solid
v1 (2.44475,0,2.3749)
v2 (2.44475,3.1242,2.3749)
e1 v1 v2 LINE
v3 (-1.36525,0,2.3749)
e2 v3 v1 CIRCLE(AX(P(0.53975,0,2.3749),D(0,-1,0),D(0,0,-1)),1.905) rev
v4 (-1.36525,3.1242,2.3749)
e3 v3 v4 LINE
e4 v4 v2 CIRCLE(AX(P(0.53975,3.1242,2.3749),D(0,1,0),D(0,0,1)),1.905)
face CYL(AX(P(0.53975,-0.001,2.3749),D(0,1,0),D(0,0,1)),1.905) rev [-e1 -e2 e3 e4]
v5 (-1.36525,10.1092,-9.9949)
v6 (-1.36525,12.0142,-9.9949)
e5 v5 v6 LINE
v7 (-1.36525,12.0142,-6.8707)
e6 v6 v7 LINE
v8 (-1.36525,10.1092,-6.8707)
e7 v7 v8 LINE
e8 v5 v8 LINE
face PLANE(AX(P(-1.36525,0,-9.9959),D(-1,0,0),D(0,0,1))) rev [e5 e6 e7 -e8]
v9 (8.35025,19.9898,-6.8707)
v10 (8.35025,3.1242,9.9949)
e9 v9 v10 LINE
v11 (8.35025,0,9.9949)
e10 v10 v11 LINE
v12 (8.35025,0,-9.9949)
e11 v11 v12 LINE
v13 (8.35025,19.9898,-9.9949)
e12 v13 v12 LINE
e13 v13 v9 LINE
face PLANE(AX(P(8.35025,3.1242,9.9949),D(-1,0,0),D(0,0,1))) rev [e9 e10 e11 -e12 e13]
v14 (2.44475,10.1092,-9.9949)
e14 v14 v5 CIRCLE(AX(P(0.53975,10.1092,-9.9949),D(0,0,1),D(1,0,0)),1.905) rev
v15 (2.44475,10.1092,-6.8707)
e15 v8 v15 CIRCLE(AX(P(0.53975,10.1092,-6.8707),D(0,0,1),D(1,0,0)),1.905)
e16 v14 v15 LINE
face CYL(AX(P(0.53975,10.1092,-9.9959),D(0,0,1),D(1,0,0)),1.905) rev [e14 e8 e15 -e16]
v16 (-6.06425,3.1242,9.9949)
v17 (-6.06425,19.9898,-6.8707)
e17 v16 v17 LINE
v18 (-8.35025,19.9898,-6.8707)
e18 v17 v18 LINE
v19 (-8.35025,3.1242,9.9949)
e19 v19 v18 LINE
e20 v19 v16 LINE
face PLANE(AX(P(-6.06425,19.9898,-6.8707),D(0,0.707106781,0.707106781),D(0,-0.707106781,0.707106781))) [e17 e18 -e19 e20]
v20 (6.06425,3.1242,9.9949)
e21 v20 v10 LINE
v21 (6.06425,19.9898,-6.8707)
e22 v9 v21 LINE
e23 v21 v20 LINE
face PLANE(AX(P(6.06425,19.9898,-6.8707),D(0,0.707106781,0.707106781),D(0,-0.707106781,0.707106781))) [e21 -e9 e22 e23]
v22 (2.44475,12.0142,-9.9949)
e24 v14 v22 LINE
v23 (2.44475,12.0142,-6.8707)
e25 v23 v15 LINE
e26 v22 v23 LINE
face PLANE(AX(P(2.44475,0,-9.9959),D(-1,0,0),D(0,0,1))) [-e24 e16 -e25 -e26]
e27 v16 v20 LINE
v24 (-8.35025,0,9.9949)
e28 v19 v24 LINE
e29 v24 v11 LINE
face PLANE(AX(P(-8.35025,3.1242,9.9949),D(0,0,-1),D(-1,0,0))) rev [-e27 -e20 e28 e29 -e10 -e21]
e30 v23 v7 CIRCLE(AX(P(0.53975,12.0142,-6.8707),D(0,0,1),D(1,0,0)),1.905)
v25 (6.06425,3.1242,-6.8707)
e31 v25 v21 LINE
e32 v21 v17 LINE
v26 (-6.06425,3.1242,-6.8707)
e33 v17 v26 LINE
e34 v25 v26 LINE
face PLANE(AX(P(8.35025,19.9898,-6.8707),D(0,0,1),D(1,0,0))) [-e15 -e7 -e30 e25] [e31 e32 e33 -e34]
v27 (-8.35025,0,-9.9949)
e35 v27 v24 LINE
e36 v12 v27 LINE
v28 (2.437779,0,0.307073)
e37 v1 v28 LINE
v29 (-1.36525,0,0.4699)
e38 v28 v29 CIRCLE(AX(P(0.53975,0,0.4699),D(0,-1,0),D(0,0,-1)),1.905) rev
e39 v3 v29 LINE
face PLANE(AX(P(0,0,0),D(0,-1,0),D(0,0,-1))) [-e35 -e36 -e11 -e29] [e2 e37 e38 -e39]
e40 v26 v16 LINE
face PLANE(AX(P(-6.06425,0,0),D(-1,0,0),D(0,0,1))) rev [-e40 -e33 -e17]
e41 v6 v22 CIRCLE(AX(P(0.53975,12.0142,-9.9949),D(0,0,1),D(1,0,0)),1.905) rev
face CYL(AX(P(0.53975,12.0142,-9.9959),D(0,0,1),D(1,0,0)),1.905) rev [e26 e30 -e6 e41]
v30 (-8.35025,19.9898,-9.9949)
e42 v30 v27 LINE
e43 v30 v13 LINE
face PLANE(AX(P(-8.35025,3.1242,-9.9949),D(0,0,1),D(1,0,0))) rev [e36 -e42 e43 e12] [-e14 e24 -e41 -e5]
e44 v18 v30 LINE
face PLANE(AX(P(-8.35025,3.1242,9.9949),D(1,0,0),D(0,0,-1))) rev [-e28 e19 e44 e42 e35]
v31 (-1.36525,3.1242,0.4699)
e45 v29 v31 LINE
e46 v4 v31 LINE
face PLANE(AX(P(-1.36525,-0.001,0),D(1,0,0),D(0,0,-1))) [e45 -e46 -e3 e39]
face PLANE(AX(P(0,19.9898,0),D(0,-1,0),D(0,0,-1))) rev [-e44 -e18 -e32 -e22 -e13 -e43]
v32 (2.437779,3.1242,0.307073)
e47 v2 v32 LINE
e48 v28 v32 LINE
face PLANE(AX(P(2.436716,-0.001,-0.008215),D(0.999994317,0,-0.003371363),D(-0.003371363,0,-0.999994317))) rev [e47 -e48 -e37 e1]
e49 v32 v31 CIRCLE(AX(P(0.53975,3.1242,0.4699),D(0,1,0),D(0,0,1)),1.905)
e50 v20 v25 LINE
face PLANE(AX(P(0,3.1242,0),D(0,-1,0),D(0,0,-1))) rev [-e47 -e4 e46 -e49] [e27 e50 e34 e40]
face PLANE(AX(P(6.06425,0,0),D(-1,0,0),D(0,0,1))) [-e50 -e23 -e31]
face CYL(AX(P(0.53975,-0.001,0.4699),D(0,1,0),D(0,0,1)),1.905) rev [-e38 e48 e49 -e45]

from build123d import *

# Parameters (mm, degrees)
SKETCH1_W           = 16.7005
SKETCH1_H           = 19.9898
BOSS_EXTRUDE1_DEPTH = 3.1242
SKETCH3_W           = 16.7005
SKETCH3_H           = 3.1242
BOSS_EXTRUDE2_DEPTH = 19.9898
BOSS_EXTRUDE3_DEPTH = 2.286
BOSS_EXTRUDE4_DEPTH = 2.286
CUT_EXTRUDE1_REACH  = 29.455
SKETCH6_R           = 1.905
CUT_EXTRUDE2_START  = -3.1242
CUT_EXTRUDE2_DEPTH  = 3.1242


# Read off the part's stored shape, not the designer's step: Cut-Extrude2
with BuildPart() as part:
    # Sketch1 → Boss-Extrude1 (new body)
    with BuildSketch(Plane(origin=(0, 0, 0), x_dir=(1, 0, 0), z_dir=(0, 1, 0))):
        Rectangle(SKETCH1_W, SKETCH1_H)
    extrude(amount=BOSS_EXTRUDE1_DEPTH)

    # Sketch3 → Boss-Extrude2 (add)
    with BuildSketch(Plane.XZ):
        with Locations((0, -8.4328)):
            Rectangle(SKETCH3_W, SKETCH3_H)
    extrude(amount=-BOSS_EXTRUDE2_DEPTH)

    # Sketch4 → Boss-Extrude3 (add)
    with BuildSketch(Plane(origin=(8.35025, 0, 0), x_dir=(0, 0, -1), z_dir=(1, 0, 0))):
        Polygon((6.8707, 19.9898), (-9.9949, 3.1242), (6.8707, 3.1242), align=None)
    extrude(amount=-BOSS_EXTRUDE3_DEPTH)

    # Sketch5 → Boss-Extrude4 (add)
    with BuildSketch(Plane.ZY.offset(8.35025)):
        Polygon((-6.8707, 19.9898), (9.9949, 3.1242), (-6.8707, 3.1242), align=None)
    extrude(amount=-BOSS_EXTRUDE4_DEPTH)

    # Sketch6 → Cut-Extrude1 (cut, up to next)
    with BuildSketch(Plane.XY.offset(-6.8707), mode=Mode.PRIVATE) as cut_extrude1_sk1:
        with Locations((0.53975, 10.1092)):
            Circle(SKETCH6_R)
    cut_extrude1_tool1 = extrude(cut_extrude1_sk1.sketch, amount=-CUT_EXTRUDE1_REACH, mode=Mode.PRIVATE) & part.part
    # Sketch6 → Cut-Extrude1 (cut, up to next)
    with BuildSketch(Plane.XY.offset(-6.8707), mode=Mode.PRIVATE) as cut_extrude1_sk2:
        with Locations((0.53975, 12.0142)):
            Circle(SKETCH6_R)
    cut_extrude1_tool2 = extrude(cut_extrude1_sk2.sketch, amount=-CUT_EXTRUDE1_REACH, mode=Mode.PRIVATE) & part.part
    # Sketch6 → Cut-Extrude1 (cut, up to next)
    with BuildSketch(Plane.XY.offset(-6.8707), mode=Mode.PRIVATE) as cut_extrude1_sk3:
        with BuildLine():
            Line((2.44475, 10.1092), (2.44475, 12.0142))
            ThreePointArc((2.44475, 12.0142), (2.379838699, 11.521149719), (2.189528394, 11.0617))
            ThreePointArc((2.189528394, 11.0617), (2.379838699, 10.602250281), (2.44475, 10.1092))
        make_face()
    cut_extrude1_tool3 = extrude(cut_extrude1_sk3.sketch, amount=-CUT_EXTRUDE1_REACH, mode=Mode.PRIVATE) & part.part
    # Sketch6 → Cut-Extrude1 (cut, up to next)
    with BuildSketch(Plane.XY.offset(-6.8707), mode=Mode.PRIVATE) as cut_extrude1_sk4:
        with Locations((0.53975, 12.0142)):
            Circle(SKETCH6_R)
    cut_extrude1_tool4 = extrude(cut_extrude1_sk4.sketch, amount=-CUT_EXTRUDE1_REACH, mode=Mode.PRIVATE) & part.part
    # Sketch6 → Cut-Extrude1 (cut, up to next)
    with BuildSketch(Plane.XY.offset(-6.8707), mode=Mode.PRIVATE) as cut_extrude1_sk5:
        with Locations((0.53975, 10.1092)):
            Circle(SKETCH6_R)
    cut_extrude1_tool5 = extrude(cut_extrude1_sk5.sketch, amount=-CUT_EXTRUDE1_REACH, mode=Mode.PRIVATE) & part.part
    # Sketch6 → Cut-Extrude1 (cut, up to next)
    with BuildSketch(Plane.XY.offset(-6.8707), mode=Mode.PRIVATE) as cut_extrude1_sk6:
        with BuildLine():
            ThreePointArc((-1.110028394, 11.0617), (-1.300338699, 11.521149719), (-1.36525, 12.0142))
            Line((-1.36525, 12.0142), (-1.36525, 10.1092))
            ThreePointArc((-1.36525, 10.1092), (-1.300338699, 10.602250281), (-1.110028394, 11.0617))
        make_face()
    cut_extrude1_tool6 = extrude(cut_extrude1_sk6.sketch, amount=-CUT_EXTRUDE1_REACH, mode=Mode.PRIVATE) & part.part
    # Sketch6 → Cut-Extrude1 (cut, up to next)
    with BuildSketch(Plane.XY.offset(-6.8707), mode=Mode.PRIVATE) as cut_extrude1_sk7:
        with Locations((0.53975, 10.1092)):
            Circle(SKETCH6_R)
    cut_extrude1_tool7 = extrude(cut_extrude1_sk7.sketch, amount=-CUT_EXTRUDE1_REACH, mode=Mode.PRIVATE) & part.part
    # Sketch6 → Cut-Extrude1 (cut, up to next)
    with BuildSketch(Plane.XY.offset(-6.8707), mode=Mode.PRIVATE) as cut_extrude1_sk8:
        with Locations((0.53975, 12.0142)):
            Circle(SKETCH6_R)
    cut_extrude1_tool8 = extrude(cut_extrude1_sk8.sketch, amount=-CUT_EXTRUDE1_REACH, mode=Mode.PRIVATE) & part.part
    add(cut_extrude1_tool1.solids().sort_by_distance((0.53975, 10.1092, -6.8707))[0], mode=Mode.SUBTRACT)
    add(cut_extrude1_tool2.solids().sort_by_distance((0.53975, 12.0142, -6.8707))[0], mode=Mode.SUBTRACT)
    add(cut_extrude1_tool3.solids().sort_by_distance((2.369151, 11.0617, -6.8707))[0], mode=Mode.SUBTRACT)
    add(cut_extrude1_tool4.solids().sort_by_distance((0.53975, 12.0142, -6.8707))[0], mode=Mode.SUBTRACT)
    add(cut_extrude1_tool5.solids().sort_by_distance((0.53975, 10.1092, -6.8707))[0], mode=Mode.SUBTRACT)
    add(cut_extrude1_tool6.solids().sort_by_distance((-1.289651, 11.0617, -6.8707))[0], mode=Mode.SUBTRACT)
    add(cut_extrude1_tool7.solids().sort_by_distance((0.53975, 10.1092, -6.8707))[0], mode=Mode.SUBTRACT)
    add(cut_extrude1_tool8.solids().sort_by_distance((0.53975, 12.0142, -6.8707))[0], mode=Mode.SUBTRACT)

    # Cut-Extrude2 outline → Cut-Extrude2 (cut)
    with BuildSketch(Plane(origin=(0, 3.1242, 0), x_dir=(1, 0, 0), z_dir=(0, 1, 0)).offset(CUT_EXTRUDE2_START)):
        with BuildLine():
            Line((-1.36525, -0.4699), (-1.36525, -2.3749))
            ThreePointArc((-1.36525, -2.3749), (0.53975, -4.2799), (2.44475, -2.3749))
            Line((2.44475, -2.3749), (2.437778565, -0.307073202))
            ThreePointArc((2.437778565, -0.307073202), (0.458262015, 1.433356343), (-1.36525, -0.4699))
        make_face()
    extrude(amount=CUT_EXTRUDE2_DEPTH, mode=Mode.SUBTRACT)


solid = part.part
